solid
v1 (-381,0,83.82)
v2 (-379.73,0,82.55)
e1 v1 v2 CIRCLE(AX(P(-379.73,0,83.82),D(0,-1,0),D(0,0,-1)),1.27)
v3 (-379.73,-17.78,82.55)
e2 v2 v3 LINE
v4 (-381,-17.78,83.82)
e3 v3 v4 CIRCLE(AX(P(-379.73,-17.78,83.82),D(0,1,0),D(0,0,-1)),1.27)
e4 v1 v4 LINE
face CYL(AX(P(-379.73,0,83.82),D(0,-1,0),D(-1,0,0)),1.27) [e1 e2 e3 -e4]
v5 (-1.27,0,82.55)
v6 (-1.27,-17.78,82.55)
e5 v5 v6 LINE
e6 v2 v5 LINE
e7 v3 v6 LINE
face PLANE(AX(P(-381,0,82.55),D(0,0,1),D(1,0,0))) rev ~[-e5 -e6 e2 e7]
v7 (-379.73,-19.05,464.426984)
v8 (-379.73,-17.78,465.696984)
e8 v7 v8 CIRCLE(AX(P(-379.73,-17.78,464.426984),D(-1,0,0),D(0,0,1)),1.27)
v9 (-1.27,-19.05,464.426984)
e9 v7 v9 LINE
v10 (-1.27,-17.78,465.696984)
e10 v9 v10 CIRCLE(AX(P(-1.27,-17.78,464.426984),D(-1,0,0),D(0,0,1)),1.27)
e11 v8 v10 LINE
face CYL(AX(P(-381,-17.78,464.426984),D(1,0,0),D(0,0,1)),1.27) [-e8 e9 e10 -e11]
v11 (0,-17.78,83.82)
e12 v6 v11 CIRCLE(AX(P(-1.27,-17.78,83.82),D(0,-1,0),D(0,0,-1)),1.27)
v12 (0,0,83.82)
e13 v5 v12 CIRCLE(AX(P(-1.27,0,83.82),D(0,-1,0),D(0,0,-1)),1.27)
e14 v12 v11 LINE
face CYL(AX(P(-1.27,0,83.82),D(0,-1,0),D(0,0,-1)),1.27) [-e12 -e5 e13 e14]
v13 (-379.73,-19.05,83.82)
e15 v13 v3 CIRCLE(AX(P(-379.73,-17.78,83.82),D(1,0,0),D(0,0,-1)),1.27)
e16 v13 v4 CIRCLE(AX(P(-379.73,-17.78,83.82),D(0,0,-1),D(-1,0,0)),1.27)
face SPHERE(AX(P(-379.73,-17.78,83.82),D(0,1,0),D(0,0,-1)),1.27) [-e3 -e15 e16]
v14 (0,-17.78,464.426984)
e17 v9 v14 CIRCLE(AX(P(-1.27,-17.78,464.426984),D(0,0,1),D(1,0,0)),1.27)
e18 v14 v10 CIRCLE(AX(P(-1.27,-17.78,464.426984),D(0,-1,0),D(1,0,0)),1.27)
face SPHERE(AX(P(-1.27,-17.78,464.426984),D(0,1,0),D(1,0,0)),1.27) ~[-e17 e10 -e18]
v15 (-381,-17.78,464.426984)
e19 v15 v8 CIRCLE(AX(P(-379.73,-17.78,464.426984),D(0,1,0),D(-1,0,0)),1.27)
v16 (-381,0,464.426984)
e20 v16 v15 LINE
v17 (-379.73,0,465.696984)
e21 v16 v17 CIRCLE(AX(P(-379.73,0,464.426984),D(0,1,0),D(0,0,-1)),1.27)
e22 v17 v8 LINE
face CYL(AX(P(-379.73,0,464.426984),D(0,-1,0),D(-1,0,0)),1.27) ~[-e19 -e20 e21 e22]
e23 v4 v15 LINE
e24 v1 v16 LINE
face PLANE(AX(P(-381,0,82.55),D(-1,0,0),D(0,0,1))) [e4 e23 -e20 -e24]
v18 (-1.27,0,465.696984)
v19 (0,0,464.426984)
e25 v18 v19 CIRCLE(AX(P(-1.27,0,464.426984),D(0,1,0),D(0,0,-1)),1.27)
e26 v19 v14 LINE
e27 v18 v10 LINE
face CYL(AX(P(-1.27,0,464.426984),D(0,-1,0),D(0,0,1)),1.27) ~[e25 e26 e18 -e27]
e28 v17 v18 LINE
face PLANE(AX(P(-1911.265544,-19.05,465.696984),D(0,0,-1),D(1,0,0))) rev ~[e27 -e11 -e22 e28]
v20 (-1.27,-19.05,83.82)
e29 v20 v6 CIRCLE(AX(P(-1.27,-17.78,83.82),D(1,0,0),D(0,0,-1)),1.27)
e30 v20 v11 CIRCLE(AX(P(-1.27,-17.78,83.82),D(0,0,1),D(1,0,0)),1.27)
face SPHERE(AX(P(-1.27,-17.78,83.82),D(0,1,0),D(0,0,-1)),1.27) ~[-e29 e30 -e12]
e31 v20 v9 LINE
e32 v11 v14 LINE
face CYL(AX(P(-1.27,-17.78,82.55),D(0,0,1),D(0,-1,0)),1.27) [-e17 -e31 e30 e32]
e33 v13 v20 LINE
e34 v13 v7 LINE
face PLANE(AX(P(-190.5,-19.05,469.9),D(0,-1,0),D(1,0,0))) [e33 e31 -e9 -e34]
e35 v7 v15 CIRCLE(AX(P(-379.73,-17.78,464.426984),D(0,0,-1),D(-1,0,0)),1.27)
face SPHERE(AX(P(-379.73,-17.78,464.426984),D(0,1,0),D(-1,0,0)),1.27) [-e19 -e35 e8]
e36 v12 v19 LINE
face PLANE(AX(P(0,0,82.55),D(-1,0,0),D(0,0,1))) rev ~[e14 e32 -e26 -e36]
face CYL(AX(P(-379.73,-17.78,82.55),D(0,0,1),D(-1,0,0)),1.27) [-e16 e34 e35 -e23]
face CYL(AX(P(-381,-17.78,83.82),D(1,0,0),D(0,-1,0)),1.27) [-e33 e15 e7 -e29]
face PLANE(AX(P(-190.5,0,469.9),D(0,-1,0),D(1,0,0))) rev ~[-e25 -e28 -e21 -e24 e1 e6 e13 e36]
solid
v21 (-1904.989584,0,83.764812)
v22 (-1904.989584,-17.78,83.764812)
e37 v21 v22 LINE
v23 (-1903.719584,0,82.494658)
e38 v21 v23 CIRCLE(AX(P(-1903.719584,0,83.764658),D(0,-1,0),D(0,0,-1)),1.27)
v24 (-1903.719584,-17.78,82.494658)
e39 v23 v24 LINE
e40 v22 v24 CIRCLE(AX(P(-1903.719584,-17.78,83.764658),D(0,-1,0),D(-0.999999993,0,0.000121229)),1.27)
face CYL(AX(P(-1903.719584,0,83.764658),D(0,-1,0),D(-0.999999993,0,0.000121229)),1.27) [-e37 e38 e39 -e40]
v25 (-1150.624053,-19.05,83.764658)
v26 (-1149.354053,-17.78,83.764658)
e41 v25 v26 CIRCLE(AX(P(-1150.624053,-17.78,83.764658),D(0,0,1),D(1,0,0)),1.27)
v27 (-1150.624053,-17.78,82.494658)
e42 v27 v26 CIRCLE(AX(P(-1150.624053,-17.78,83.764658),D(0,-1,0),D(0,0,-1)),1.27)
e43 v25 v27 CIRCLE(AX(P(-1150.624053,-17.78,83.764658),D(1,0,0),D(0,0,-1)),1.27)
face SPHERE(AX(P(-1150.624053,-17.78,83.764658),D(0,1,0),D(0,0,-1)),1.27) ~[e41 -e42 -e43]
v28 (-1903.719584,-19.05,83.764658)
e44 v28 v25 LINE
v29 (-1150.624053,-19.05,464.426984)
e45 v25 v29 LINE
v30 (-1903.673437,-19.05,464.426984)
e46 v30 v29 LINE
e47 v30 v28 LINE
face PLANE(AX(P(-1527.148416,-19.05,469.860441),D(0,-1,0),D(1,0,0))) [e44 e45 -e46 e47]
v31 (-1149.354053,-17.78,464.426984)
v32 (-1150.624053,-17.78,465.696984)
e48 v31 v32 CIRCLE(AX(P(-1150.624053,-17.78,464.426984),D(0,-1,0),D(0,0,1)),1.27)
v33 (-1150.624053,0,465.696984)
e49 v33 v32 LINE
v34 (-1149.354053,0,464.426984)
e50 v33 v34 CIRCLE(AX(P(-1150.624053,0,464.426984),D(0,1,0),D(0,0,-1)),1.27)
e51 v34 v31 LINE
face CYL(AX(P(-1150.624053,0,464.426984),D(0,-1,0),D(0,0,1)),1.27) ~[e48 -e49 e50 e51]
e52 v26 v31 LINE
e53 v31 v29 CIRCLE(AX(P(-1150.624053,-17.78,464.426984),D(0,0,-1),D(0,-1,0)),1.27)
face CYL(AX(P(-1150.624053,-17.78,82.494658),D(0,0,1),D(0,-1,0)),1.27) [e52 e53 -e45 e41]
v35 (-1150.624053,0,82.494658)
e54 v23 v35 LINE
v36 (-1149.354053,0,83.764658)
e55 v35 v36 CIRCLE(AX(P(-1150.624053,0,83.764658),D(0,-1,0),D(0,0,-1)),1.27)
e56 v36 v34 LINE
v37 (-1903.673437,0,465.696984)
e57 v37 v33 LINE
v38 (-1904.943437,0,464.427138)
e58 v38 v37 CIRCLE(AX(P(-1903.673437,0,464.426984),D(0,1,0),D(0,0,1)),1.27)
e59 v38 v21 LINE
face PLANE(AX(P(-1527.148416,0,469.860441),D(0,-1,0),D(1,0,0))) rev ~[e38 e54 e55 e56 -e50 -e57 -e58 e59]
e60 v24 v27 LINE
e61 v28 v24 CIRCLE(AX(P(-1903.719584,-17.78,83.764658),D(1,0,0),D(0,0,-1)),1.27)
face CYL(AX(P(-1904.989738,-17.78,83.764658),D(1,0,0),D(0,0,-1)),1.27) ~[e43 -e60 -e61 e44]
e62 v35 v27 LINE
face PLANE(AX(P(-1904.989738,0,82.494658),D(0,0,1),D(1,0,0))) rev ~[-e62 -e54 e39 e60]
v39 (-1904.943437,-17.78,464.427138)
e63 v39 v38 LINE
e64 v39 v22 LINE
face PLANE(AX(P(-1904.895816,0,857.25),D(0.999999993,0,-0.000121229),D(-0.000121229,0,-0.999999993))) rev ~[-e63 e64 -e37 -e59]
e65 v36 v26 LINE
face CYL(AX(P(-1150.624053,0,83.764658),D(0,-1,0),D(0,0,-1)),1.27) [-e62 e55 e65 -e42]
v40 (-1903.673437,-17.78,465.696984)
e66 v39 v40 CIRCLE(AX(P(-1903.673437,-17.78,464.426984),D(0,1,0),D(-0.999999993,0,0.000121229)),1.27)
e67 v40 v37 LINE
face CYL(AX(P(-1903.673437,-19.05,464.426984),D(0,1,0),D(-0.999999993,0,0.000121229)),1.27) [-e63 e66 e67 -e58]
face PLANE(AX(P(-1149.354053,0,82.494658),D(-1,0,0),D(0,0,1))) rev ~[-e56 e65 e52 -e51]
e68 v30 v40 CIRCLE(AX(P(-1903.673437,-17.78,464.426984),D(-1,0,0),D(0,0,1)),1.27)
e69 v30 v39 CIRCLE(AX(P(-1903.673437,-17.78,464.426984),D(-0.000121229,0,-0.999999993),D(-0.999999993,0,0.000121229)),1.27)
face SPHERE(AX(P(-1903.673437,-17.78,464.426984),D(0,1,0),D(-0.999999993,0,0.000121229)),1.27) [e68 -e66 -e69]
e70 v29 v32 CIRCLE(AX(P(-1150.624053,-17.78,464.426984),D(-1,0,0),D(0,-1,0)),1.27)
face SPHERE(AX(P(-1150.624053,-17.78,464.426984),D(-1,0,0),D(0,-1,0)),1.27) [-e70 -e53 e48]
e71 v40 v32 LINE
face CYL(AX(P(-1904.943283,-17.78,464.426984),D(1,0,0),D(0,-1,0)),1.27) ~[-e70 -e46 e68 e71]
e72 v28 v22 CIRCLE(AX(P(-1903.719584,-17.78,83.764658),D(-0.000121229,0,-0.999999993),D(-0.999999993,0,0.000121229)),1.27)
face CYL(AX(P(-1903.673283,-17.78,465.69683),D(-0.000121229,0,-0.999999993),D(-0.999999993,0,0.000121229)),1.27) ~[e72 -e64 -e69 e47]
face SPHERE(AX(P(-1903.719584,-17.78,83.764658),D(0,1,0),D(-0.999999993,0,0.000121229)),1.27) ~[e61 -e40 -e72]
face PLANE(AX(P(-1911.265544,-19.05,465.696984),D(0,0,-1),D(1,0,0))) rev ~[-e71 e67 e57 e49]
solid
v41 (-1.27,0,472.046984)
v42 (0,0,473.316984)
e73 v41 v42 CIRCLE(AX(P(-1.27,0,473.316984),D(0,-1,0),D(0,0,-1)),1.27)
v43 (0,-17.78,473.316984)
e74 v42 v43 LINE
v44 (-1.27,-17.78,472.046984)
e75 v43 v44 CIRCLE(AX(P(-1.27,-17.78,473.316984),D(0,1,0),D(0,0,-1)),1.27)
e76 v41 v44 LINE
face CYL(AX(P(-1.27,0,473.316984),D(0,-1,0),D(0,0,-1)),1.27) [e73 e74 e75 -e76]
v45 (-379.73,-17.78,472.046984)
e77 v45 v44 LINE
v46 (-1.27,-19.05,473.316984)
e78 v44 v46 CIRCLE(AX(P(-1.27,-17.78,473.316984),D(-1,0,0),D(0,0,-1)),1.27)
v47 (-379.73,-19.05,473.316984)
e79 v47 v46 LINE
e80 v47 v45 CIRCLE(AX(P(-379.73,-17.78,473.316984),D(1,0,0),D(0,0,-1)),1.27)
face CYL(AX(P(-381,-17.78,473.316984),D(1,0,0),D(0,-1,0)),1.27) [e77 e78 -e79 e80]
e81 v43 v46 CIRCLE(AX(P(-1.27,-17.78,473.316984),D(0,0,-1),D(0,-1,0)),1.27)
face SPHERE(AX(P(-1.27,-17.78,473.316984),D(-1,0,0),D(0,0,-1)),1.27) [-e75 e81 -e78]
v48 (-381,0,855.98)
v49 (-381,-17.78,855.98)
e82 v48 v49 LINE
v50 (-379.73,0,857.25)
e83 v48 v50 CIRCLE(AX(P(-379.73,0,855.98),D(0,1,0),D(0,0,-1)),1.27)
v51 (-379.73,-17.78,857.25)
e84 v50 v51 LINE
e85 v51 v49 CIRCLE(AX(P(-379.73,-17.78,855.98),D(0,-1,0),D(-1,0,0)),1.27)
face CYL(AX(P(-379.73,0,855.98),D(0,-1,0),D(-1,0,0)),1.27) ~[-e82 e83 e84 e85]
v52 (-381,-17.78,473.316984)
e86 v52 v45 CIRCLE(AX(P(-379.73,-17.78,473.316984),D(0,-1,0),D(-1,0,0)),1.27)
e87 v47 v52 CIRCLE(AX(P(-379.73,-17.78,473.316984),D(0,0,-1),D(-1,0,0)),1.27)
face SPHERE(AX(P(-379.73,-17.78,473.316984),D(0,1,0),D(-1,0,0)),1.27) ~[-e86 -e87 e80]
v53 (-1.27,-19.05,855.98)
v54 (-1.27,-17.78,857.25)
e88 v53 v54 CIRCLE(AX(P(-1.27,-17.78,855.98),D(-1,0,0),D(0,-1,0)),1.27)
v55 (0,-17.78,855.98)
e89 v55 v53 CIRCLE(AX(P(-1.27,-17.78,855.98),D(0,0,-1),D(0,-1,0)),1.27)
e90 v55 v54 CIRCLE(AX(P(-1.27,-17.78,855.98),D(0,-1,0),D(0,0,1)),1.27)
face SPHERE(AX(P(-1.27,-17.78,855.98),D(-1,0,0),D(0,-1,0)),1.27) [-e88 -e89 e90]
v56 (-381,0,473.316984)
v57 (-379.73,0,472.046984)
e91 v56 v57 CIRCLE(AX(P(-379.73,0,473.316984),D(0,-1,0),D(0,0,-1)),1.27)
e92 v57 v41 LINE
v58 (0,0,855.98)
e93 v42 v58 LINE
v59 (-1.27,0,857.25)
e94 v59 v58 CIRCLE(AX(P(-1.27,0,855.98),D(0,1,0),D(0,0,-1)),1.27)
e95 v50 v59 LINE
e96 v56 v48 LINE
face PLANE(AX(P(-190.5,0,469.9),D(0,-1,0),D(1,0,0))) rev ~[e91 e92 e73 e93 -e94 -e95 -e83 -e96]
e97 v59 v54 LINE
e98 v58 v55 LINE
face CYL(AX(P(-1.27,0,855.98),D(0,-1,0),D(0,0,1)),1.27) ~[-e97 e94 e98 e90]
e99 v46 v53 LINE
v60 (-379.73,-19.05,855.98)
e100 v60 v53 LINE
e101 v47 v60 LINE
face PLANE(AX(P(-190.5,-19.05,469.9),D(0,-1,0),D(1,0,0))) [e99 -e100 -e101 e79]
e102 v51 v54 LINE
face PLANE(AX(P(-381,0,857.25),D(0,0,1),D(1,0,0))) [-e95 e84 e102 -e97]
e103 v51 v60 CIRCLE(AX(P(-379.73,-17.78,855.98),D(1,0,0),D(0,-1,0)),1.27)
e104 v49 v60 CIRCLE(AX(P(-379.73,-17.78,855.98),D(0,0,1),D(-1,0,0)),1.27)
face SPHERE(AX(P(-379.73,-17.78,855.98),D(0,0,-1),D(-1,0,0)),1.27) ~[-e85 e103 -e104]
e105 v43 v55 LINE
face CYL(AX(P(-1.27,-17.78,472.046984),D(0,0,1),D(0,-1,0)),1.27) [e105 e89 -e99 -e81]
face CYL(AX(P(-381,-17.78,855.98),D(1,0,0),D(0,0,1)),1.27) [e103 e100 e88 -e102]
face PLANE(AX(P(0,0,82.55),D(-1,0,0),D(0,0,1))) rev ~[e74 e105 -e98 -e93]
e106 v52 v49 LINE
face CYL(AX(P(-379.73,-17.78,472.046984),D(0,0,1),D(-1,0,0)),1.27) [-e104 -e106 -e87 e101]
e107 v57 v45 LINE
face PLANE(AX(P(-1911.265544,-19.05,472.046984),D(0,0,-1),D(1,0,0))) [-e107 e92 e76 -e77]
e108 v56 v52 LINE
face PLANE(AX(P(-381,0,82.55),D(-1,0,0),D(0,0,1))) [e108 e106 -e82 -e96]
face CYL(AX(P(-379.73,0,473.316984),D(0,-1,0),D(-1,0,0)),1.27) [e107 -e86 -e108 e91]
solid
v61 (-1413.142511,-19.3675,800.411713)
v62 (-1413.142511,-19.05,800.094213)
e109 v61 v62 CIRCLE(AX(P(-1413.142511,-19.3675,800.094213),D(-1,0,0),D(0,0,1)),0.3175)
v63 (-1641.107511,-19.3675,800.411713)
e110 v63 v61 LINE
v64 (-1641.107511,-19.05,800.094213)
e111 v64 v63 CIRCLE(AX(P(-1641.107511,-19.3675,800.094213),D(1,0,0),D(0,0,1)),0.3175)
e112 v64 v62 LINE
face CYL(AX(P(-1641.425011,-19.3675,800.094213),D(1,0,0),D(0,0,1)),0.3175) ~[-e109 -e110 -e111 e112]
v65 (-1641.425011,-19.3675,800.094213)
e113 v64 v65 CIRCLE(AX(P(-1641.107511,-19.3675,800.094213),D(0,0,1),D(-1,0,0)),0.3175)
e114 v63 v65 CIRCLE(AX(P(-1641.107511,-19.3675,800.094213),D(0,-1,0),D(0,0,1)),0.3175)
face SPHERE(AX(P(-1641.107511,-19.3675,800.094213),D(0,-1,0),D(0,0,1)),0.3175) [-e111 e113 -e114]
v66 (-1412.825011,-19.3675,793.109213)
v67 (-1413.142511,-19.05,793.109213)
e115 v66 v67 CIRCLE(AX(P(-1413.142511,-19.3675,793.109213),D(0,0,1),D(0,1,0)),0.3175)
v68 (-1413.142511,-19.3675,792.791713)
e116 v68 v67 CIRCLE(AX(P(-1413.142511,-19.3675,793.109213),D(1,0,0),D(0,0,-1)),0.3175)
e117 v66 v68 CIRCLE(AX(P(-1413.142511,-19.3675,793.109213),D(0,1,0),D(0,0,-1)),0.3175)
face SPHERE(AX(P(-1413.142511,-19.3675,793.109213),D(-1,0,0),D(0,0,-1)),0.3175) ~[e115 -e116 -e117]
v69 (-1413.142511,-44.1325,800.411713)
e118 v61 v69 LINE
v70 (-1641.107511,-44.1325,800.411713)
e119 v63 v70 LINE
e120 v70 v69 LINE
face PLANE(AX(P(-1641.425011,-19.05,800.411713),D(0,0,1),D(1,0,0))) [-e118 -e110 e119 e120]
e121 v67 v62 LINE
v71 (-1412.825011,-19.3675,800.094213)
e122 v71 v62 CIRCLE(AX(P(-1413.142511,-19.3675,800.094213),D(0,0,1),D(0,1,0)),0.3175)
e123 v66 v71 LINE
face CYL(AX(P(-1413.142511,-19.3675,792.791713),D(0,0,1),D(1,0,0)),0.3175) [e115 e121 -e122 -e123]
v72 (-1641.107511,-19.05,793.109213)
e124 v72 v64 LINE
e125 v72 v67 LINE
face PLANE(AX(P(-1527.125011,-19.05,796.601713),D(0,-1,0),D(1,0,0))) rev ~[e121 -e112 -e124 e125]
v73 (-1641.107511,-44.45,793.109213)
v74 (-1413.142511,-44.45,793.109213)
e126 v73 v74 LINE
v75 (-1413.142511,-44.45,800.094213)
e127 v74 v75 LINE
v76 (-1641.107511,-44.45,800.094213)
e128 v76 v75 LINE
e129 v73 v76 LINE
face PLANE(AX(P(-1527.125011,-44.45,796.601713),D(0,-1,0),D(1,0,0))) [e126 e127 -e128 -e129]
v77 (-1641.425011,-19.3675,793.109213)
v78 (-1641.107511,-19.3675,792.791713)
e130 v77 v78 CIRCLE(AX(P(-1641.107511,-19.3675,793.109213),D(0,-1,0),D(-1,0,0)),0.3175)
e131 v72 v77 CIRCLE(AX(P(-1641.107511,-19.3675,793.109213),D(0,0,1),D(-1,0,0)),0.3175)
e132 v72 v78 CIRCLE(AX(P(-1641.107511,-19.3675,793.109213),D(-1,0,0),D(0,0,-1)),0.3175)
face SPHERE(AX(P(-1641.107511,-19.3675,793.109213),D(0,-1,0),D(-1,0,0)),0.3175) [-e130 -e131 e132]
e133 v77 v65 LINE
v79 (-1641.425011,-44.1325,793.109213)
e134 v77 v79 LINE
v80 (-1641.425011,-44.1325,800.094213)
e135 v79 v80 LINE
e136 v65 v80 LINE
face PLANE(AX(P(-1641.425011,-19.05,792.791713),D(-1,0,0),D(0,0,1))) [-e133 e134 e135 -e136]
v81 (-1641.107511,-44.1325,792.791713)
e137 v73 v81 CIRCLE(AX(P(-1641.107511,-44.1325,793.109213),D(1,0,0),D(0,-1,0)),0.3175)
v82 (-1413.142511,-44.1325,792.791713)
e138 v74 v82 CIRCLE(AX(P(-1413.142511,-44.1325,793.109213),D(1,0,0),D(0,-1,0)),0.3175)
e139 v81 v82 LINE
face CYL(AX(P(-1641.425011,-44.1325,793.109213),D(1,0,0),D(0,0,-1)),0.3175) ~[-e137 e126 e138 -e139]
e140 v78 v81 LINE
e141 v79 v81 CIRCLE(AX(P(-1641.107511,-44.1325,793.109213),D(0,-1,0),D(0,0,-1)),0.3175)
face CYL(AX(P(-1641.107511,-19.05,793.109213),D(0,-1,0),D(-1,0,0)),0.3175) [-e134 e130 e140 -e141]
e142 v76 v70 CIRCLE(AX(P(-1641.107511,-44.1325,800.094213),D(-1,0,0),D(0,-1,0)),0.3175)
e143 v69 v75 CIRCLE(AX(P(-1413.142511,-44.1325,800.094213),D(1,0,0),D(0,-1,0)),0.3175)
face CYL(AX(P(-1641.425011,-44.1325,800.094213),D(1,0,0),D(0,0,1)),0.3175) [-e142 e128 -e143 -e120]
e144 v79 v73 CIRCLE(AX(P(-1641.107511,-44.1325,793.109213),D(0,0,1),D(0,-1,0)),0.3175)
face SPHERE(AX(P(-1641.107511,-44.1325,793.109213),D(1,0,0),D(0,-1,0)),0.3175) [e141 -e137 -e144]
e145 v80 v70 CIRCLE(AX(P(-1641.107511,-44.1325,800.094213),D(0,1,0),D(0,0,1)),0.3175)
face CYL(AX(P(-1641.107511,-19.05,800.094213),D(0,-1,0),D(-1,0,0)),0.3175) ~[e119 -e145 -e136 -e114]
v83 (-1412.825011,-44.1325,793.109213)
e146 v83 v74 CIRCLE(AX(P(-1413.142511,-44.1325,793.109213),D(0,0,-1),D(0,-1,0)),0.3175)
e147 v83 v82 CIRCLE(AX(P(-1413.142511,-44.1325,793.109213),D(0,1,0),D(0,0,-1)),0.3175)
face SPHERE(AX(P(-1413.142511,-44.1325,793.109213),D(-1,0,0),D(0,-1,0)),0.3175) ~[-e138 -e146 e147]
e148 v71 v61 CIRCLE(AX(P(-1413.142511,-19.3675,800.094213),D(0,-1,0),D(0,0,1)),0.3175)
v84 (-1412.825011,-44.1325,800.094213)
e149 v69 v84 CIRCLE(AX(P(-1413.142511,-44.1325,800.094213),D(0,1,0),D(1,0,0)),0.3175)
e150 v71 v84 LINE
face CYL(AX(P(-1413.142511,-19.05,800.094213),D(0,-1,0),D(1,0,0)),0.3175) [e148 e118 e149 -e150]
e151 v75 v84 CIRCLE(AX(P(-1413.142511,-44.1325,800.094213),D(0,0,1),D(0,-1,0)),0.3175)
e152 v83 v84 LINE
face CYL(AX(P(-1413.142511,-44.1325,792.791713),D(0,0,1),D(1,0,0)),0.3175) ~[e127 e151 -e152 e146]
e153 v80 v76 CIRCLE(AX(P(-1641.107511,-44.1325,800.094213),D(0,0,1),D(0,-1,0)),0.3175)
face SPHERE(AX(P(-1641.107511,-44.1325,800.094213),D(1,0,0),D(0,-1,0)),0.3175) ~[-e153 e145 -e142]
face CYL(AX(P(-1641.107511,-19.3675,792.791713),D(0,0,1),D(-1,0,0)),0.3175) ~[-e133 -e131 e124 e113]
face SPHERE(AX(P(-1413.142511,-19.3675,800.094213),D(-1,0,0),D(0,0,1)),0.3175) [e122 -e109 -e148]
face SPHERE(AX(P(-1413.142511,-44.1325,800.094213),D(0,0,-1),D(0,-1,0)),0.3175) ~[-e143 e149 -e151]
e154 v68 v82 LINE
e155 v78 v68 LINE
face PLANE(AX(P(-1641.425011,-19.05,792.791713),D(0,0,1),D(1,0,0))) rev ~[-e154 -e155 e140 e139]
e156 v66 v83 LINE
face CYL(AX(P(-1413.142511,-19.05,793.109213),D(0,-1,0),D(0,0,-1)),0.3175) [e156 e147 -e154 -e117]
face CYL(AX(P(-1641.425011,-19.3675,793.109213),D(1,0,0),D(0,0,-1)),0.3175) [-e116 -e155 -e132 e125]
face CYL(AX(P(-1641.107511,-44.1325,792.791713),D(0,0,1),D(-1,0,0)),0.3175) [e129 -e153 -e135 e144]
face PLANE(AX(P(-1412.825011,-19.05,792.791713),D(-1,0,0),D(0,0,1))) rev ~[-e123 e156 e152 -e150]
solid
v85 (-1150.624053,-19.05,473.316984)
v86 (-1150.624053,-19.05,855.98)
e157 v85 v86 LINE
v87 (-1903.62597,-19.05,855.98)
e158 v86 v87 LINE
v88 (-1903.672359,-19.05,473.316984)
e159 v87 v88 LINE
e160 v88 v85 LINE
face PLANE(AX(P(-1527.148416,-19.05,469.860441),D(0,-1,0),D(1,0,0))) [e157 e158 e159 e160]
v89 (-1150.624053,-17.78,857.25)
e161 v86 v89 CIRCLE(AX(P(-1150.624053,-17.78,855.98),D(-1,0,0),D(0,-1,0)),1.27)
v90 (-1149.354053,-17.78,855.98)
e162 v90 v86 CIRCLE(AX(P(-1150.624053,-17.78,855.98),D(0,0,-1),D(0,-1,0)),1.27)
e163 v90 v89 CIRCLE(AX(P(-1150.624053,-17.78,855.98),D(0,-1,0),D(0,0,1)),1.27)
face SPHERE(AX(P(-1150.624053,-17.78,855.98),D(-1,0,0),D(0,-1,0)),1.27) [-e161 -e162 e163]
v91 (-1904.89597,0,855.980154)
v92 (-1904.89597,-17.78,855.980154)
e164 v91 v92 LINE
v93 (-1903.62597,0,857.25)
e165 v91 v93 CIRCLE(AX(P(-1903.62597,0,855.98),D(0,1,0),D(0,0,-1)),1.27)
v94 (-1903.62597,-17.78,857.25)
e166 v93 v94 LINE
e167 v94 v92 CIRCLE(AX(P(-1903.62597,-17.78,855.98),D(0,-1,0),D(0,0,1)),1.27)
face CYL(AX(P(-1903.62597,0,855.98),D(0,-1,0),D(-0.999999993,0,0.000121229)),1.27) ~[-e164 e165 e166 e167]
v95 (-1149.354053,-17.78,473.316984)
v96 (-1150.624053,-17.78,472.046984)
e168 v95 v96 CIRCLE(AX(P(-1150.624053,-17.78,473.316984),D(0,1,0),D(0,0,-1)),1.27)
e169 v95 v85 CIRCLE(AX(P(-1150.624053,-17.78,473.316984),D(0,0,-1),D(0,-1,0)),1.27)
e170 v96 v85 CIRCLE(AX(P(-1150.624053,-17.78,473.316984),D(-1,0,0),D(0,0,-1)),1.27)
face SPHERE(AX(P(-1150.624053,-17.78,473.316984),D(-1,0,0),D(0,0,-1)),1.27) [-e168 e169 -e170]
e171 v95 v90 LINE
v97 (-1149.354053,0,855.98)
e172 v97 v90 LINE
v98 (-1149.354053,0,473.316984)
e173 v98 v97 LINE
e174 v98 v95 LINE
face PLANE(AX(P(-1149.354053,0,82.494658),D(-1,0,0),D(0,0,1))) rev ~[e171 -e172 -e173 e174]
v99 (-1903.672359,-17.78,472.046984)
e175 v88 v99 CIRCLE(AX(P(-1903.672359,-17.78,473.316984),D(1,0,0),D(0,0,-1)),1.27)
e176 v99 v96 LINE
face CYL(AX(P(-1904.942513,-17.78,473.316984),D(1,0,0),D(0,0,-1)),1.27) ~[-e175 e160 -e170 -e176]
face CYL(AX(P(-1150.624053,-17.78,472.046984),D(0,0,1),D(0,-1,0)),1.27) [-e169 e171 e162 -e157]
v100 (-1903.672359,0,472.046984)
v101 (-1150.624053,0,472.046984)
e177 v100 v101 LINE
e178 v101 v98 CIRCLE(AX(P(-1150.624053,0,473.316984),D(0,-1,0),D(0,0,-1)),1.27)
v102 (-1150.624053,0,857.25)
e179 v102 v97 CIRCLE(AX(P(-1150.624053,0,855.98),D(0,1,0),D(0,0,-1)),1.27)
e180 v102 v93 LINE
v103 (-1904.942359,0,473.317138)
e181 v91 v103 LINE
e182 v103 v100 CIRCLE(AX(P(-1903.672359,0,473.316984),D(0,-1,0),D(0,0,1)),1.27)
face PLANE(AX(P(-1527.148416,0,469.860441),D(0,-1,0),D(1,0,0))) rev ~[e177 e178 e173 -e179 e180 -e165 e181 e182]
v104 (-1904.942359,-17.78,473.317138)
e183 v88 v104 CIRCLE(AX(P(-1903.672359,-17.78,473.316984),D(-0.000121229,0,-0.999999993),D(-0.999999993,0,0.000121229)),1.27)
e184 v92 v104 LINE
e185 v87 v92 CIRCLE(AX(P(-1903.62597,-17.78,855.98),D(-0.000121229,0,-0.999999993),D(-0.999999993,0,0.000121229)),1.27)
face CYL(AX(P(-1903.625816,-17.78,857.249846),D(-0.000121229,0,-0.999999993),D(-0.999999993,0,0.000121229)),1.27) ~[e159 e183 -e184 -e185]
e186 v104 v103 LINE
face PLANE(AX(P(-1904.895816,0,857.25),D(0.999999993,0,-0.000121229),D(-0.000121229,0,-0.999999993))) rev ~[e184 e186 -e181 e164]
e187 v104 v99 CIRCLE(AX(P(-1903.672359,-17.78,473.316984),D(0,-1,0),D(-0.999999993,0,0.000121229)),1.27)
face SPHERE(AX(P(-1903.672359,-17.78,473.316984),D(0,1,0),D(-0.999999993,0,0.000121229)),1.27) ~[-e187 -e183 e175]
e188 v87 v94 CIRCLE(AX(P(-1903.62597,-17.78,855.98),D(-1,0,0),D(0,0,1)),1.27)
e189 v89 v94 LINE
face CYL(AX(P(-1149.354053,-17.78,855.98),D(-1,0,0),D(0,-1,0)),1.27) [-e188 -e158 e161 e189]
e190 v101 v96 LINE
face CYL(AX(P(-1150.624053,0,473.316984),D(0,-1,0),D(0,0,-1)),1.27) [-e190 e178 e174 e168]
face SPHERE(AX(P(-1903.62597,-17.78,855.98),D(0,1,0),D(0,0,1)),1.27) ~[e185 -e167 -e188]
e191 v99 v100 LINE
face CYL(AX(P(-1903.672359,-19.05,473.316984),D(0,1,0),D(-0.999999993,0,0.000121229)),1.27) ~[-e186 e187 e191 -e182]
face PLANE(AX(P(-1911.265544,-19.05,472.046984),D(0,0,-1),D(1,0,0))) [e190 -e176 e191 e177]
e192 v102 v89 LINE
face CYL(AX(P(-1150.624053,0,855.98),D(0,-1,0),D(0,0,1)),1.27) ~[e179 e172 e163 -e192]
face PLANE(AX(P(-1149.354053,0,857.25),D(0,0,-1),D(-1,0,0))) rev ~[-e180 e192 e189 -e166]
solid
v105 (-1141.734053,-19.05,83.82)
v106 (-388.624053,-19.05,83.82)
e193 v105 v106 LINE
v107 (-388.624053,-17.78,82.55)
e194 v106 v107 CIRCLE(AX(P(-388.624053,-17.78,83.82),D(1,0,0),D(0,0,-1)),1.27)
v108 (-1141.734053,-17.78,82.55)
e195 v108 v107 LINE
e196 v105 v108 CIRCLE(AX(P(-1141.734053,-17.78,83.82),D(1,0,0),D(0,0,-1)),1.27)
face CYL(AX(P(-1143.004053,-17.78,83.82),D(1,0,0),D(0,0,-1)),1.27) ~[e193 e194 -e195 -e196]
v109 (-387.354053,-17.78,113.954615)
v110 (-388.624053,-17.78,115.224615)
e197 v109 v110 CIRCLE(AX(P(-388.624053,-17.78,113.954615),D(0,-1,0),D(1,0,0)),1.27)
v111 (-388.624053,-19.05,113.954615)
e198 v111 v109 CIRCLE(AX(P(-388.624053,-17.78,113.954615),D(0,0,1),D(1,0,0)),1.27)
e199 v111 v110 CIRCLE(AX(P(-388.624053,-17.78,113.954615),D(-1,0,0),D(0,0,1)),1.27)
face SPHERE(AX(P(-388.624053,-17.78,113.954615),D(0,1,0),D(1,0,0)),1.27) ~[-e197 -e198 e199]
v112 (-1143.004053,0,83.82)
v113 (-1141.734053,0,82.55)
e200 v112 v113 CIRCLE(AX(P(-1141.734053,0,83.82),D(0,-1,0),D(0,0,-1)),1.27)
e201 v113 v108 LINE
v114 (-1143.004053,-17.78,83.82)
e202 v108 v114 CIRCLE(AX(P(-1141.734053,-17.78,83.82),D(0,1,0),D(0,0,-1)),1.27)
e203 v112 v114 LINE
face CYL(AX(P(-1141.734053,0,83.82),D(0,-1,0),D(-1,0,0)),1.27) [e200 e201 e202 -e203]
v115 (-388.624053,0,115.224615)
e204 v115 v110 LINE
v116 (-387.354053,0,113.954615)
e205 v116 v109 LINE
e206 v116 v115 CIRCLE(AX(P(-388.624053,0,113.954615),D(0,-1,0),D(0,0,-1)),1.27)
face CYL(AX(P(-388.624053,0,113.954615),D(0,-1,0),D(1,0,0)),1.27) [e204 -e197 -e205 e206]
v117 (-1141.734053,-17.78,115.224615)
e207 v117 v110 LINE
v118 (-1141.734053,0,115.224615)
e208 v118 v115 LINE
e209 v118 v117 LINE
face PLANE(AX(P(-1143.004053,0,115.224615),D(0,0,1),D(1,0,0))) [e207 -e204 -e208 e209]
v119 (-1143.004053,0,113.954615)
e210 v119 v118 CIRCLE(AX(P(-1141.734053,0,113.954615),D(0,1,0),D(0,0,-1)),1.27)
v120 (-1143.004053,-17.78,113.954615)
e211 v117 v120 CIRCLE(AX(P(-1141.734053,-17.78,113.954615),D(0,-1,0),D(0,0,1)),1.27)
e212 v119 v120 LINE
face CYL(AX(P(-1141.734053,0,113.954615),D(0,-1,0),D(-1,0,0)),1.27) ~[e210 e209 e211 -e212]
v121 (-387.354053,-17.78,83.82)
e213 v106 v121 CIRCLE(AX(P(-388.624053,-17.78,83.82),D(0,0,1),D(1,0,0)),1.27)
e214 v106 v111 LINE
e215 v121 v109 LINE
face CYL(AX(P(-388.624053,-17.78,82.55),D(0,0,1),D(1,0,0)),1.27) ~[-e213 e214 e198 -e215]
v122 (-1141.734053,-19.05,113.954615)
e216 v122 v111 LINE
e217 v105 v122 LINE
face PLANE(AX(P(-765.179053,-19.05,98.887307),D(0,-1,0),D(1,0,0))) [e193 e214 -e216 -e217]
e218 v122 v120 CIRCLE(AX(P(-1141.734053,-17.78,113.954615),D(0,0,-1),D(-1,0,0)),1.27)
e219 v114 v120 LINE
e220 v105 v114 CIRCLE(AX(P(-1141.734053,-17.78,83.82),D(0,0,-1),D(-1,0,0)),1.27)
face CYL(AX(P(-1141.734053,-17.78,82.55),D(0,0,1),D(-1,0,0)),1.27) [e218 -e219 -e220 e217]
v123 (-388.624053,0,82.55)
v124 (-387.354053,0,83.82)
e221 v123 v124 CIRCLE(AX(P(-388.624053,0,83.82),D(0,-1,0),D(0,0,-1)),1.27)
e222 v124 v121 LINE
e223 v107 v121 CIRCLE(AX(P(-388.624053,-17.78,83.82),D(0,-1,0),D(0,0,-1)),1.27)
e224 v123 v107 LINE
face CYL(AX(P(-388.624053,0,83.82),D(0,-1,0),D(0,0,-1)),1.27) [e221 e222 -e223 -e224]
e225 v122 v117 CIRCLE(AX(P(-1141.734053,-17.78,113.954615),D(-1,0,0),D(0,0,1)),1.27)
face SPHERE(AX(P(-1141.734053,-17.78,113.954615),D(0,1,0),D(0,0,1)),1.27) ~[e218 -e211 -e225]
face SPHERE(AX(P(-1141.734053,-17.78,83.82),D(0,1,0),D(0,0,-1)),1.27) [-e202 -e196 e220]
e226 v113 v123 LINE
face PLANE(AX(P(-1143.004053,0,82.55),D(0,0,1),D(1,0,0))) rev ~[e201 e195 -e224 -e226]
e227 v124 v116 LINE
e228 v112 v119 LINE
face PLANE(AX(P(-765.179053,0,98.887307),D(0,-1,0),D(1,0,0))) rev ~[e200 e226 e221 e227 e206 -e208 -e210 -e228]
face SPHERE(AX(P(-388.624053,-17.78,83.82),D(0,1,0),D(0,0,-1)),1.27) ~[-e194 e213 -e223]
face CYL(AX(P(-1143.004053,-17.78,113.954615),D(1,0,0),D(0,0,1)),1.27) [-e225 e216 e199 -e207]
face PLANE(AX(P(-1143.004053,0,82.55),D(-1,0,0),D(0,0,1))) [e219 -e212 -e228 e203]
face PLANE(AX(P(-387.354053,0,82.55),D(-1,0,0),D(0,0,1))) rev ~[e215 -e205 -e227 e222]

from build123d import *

# Parameters (mm, degrees)
F0_W     = 381
F0_H     = 774.7
F1_DEPTH = 19.05
F0_W_2   = 755.65
F0_H_2   = 32.6746147394
F3_W     = 228.6
F3_H     = 7.62
F4_DEPTH = 25.4
F5_R     = 0.3175
F6_W     = 2032
F6_H     = 6.35
F7_DEPTH = 25.4
F8_R     = 1.27
F8_2_R   = 1.27
F8_3_R   = 1.27


# Not quite as in the source:
# - a feature of the source that left no trace in its solid (it failed there, or was rolled back) is left out


with BuildPart() as f1:
    # F0 (on Front) → F1 (new body)
    with BuildSketch(Plane.XZ):
        with Locations((-190.5, 469.9)):
            Rectangle(F0_W, F0_H)
    extrude(amount=F1_DEPTH)


with BuildPart() as f1b:
    # F0 (on Front) → F1, piece 2 (new body)
    with BuildSketch(Plane.XZ):
        Polygon((-1904.895815666, 857.25), (-1904.9897383738, 82.4946576853), (-1149.3540530003, 82.4946576853), (-1149.3540530003, 82.55), (-1149.3540530003, 857.25), (-1527.1790530003, 857.25), align=None)
    extrude(amount=F1_DEPTH)


with BuildPart() as f1c:
    # F0 (on Front) → F1, piece 3 (new body)
    with BuildSketch(Plane.XZ):
        with Locations((-765.1790530003, 98.8873073697)):
            Rectangle(F0_W_2, F0_H_2)
    extrude(amount=F1_DEPTH)

    # F8#3
    f8_3_edges = [f1c.edges().sort_by_distance(p)[0] for p in [
        (-1143.004053, -9.525, 82.55),
        (-387.354053, -9.525, 82.55),
        (-765.179053, -19.05, 82.55),
        (-387.354053, -9.525, 115.224615),
        (-387.354053, -19.05, 98.887307),
        (-1143.004053, -9.525, 115.224615),
        (-765.179053, -19.05, 115.224615),
        (-1143.004053, -19.05, 98.887307),
    ]]
    fillet(f8_3_edges, radius=F8_3_R)


with BuildPart() as f4:
    # F3 (on face) → F4 (new body)
    with BuildSketch(Plane.XZ.offset(19.05)):
        with Locations((-1527.1250113088, 796.6017127037)):
            Rectangle(F3_W, F3_H)
    extrude(amount=F4_DEPTH)

    # F5
    f5_edges = [f4.edges().sort_by_distance(p)[0] for p in [
        (-1527.125011, -44.45, 792.791713),
        (-1412.825011, -44.45, 796.601713),
        (-1527.125011, -44.45, 800.411713),
        (-1641.425011, -44.45, 796.601713),
        (-1641.425011, -31.75, 800.411713),
        (-1641.425011, -31.75, 792.791713),
        (-1527.125011, -19.05, 800.411713),
        (-1641.425011, -19.05, 796.601713),
        (-1527.125011, -19.05, 792.791713),
        (-1412.825011, -31.75, 792.791713),
        (-1412.825011, -31.75, 800.411713),
        (-1412.825011, -19.05, 796.601713),
    ]]
    fillet(f5_edges, radius=F5_R)


with BuildPart() as f7_tool:
    # F6 (on face) → F7 (new body)
    with BuildSketch(Plane.XZ.offset(19.05)):
        with Locations((-895.2655443497, 468.8719840575)):
            Rectangle(F6_W, F6_H)
    extrude(amount=-F7_DEPTH)


with BuildPart() as f1_1:
    add(f1.part)

    # F7: cut by f7_tool
    add(f7_tool.part, mode=Mode.SUBTRACT)

    # F8
    f8_edges = [f1_1.edges().sort_by_distance(p)[0] for p in [
        (-381, -9.525, 472.046984),
        (-381, -9.525, 465.696984),
        (-381, -9.525, 82.55),
        (0, -9.525, 82.55),
        (-190.5, -19.05, 82.55),
        (-381, -19.05, 274.123492),
        (0, -9.525, 465.696984),
        (0, -19.05, 274.123492),
        (-190.5, -19.05, 465.696984),
        (-381, -19.05, 664.648492),
        (-381, -9.525, 857.25),
        (-190.5, -19.05, 472.046984),
        (0, -9.525, 472.046984),
        (-190.5, -19.05, 857.25),
        (0, -19.05, 664.648492),
        (0, -9.525, 857.25),
    ]]
    fillet(f8_edges, radius=F8_R)


with BuildPart() as f1b_1:
    add(f1b.part)

    # F7: cut by f7_tool
    add(f7_tool.part, mode=Mode.SUBTRACT)

    # F8#2
    f8_2_edges = [f1b_1.edges().sort_by_distance(p)[0] for p in [
        (-1904.942513, -9.525, 472.046984),
        (-1904.943283, -9.525, 465.696984),
        (-1904.919165, -19.05, 664.648492),
        (-1904.895816, -9.525, 857.25),
        (-1527.148283, -19.05, 472.046984),
        (-1149.354053, -9.525, 472.046984),
        (-1527.124934, -19.05, 857.25),
        (-1149.354053, -19.05, 664.648492),
        (-1149.354053, -9.525, 857.25),
        (-1904.989738, -9.525, 82.494658),
        (-1904.966511, -19.05, 274.095821),
        (-1149.354053, -9.525, 82.494658),
        (-1527.171896, -19.05, 82.494658),
        (-1527.148668, -19.05, 465.696984),
        (-1149.354053, -19.05, 274.095821),
        (-1149.354053, -9.525, 465.696984),
    ]]
    fillet(f8_2_edges, radius=F8_2_R)


solid = Compound([f1c.part, f4.part, f1_1.part, f1b_1.part])
